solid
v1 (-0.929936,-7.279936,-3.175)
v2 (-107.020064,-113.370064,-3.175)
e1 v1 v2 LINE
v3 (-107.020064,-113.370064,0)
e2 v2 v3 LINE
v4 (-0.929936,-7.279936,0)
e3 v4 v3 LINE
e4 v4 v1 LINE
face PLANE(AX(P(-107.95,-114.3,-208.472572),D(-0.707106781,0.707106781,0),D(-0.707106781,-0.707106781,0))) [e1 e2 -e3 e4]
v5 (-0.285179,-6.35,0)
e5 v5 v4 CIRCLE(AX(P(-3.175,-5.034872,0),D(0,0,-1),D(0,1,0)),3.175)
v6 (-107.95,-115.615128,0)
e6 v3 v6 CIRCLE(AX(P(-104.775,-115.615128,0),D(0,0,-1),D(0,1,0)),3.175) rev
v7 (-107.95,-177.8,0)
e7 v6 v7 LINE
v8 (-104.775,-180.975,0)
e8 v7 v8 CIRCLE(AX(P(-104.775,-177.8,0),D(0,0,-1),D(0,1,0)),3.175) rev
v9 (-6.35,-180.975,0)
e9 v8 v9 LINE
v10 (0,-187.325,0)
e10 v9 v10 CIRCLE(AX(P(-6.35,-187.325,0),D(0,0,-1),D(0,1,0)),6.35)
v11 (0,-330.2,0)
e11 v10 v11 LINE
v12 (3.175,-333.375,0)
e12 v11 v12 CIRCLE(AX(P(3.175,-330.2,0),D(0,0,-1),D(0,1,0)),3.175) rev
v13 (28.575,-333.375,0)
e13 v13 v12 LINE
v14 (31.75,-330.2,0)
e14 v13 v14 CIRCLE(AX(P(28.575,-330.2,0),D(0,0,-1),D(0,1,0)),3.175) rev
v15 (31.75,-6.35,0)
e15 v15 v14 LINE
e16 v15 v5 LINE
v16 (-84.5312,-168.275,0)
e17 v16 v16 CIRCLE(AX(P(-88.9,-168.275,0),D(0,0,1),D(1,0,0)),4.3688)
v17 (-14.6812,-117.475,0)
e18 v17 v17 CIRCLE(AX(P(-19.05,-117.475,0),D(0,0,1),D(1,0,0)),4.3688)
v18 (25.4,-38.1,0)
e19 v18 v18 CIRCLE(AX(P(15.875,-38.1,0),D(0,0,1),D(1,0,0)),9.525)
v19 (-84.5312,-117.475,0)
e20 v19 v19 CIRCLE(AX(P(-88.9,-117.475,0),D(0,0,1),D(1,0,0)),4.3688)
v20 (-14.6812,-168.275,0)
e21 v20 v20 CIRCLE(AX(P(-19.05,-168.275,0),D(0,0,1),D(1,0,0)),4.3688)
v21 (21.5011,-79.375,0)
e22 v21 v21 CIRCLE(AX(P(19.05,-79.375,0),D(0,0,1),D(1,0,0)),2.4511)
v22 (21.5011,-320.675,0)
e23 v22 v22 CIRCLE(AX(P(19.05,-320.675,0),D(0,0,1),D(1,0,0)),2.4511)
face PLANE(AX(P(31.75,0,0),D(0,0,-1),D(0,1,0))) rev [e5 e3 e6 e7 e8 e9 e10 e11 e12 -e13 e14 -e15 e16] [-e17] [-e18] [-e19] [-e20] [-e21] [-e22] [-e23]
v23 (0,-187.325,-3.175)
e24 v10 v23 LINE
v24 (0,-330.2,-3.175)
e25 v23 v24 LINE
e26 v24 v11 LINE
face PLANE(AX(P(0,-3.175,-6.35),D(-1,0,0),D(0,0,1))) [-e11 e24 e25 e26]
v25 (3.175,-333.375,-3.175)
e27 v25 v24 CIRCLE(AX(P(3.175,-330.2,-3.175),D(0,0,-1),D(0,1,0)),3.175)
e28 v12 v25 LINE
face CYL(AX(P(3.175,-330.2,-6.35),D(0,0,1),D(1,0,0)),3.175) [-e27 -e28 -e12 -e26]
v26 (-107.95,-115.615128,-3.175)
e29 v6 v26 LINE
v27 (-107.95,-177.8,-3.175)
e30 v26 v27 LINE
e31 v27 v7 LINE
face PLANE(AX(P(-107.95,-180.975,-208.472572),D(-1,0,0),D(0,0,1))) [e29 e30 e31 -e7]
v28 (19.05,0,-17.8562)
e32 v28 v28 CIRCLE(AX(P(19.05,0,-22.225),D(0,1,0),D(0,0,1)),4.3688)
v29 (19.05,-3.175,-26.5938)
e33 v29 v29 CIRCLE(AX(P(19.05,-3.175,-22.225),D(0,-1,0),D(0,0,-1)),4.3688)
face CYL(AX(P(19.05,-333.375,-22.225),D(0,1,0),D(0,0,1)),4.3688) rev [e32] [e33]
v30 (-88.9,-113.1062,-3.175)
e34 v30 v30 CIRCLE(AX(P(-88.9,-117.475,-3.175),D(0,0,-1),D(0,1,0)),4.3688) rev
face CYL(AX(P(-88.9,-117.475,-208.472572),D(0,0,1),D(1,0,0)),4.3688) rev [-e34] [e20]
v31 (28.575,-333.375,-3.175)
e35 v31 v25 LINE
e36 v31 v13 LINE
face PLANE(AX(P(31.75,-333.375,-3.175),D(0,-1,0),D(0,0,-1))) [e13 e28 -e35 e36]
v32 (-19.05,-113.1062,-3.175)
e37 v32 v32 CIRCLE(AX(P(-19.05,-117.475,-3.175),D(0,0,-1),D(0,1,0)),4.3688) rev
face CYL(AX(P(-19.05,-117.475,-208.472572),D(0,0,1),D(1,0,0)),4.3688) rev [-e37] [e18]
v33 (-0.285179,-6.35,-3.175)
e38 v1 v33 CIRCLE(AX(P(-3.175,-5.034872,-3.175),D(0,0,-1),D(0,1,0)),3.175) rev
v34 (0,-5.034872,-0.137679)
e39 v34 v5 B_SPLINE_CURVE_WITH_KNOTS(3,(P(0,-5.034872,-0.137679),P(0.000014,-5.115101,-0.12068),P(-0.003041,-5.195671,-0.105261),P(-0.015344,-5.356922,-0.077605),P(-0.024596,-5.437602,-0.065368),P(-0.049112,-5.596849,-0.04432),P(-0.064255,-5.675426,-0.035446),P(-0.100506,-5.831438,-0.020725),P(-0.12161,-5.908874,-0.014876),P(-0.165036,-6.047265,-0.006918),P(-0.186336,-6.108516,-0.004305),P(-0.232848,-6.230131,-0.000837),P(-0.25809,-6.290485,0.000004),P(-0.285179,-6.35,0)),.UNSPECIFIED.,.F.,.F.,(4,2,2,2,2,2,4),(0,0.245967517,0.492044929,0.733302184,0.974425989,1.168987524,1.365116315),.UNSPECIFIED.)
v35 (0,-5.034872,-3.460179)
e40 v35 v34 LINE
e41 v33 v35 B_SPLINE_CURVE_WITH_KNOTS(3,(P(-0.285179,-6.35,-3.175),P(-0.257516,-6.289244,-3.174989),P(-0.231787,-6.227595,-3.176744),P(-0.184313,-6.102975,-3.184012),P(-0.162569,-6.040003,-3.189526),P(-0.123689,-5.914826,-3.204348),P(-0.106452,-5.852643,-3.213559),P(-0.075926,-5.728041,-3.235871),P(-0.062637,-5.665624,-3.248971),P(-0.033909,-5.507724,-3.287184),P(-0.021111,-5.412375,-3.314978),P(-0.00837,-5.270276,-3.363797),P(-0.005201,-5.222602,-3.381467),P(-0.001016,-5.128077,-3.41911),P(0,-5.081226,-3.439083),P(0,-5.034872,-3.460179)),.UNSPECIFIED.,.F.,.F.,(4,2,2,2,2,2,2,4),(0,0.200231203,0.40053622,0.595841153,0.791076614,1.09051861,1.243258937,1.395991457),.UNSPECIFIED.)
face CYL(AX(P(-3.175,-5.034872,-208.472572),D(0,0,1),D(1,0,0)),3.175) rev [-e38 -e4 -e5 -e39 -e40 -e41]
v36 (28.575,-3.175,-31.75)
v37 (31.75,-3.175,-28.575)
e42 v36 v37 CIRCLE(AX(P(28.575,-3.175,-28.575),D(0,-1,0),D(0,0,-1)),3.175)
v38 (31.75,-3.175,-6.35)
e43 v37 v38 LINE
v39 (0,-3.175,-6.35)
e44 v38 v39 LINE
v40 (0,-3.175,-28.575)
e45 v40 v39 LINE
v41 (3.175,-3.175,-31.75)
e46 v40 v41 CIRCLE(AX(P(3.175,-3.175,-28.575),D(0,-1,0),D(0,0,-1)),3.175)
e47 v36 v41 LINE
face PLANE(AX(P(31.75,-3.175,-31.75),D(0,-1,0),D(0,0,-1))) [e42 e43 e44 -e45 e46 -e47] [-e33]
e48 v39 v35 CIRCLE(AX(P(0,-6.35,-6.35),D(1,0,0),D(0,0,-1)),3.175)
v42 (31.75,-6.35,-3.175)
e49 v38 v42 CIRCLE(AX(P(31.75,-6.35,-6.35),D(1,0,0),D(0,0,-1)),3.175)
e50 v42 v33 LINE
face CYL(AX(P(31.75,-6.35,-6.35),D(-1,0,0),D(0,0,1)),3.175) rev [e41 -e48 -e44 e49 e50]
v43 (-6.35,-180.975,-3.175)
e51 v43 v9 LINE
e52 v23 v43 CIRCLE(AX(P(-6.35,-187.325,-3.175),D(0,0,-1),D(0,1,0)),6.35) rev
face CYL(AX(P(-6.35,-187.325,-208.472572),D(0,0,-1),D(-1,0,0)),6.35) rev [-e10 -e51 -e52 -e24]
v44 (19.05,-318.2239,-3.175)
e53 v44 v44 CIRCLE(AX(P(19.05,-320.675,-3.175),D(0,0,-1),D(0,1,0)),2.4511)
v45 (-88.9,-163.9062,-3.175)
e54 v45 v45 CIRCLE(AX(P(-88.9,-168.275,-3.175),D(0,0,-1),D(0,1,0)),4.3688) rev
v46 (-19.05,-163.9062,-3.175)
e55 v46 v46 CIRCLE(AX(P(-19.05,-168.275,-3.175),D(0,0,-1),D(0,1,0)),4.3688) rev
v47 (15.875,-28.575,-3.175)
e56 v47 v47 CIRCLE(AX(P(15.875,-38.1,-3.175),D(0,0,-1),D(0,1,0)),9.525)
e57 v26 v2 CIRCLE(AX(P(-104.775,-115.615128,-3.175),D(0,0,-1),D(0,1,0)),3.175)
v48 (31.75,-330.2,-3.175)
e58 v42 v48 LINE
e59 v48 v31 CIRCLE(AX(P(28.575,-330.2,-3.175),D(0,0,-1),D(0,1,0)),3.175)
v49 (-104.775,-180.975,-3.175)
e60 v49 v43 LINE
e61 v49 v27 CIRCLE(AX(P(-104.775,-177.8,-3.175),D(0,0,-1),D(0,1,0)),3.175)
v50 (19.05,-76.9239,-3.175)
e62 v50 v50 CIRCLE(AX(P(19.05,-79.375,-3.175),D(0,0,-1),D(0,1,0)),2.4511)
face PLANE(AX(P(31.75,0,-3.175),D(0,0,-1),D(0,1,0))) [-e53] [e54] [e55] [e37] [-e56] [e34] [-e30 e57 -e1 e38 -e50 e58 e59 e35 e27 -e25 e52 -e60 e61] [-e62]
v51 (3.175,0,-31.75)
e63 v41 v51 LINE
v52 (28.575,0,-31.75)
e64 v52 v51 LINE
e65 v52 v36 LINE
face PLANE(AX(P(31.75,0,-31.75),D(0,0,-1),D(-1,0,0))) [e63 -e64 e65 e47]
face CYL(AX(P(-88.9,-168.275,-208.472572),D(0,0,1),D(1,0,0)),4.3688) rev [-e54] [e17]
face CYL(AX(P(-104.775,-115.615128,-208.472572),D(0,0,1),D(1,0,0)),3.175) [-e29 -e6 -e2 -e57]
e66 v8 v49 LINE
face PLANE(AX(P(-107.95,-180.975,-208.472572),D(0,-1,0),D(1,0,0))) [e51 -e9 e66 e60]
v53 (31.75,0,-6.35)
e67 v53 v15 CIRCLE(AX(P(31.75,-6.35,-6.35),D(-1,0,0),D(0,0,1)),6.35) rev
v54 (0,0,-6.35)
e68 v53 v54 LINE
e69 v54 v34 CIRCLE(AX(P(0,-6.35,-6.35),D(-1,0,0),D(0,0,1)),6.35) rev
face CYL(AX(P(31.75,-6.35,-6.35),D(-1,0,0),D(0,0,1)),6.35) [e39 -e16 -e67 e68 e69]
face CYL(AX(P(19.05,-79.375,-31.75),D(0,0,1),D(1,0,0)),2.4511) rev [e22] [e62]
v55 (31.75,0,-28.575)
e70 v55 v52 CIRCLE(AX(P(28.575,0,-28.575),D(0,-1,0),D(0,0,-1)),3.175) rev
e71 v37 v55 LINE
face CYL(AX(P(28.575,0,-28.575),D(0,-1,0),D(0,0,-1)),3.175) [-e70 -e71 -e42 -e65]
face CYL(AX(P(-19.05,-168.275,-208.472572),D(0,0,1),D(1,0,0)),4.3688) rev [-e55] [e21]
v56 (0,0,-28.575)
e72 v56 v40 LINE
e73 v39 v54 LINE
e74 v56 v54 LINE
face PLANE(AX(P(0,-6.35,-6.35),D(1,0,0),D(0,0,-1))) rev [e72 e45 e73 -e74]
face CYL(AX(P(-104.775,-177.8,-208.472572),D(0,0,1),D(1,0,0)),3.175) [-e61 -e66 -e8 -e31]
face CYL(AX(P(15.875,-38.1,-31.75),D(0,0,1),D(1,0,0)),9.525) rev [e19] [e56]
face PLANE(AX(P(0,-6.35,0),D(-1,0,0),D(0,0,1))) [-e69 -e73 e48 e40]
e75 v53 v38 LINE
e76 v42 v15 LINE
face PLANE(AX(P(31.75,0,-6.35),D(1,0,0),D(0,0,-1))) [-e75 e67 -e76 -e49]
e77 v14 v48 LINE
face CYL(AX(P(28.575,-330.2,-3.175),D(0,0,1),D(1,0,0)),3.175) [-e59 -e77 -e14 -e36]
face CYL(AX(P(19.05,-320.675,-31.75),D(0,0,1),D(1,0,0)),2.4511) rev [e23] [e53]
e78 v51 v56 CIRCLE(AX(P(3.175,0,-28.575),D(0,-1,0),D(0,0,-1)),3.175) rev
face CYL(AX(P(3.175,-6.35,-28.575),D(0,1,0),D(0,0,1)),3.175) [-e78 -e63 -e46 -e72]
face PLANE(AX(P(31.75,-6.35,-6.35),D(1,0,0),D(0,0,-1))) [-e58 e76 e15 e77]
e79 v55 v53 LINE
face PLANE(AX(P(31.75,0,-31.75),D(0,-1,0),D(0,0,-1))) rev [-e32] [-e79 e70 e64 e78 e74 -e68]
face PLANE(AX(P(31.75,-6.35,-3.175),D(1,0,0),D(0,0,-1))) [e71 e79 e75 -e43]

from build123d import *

# Parameters (mm, degrees)
BASE_FLANGE1_DEPTH  = 31.75
SKETCH6_R           = 4.3688
CUT_EXTRUDE1_DEPTH  = 337.385219094
SKETCH7_R           = 2.4511
SKETCH7_R_2         = 9.525
CUT_EXTRUDE2_DEPTH  = 337.385219094
SKETCH8_R           = 4.3688
BOSS_EXTRUDE1_DEPTH = 3.175
FILLET1_R           = 6.35
FILLET2_R           = 3.175


# Sheet-metal steps are written as plain solids
with BuildPart() as part:
    # Sketch1 → Base-Flange1 (new body)
    with BuildSketch(Plane(origin=(0, 0, 0), x_dir=(0, 0, -1), z_dir=(1, 0, 0))):
        with BuildLine():
            Line((31.75, 0), (6.35, 0))
            ThreePointArc((6.35, 0), (1.859871939, -1.859871939), (0, -6.35))
            Line((0, -6.35), (0, -333.375))
            Line((0, -333.375), (3.175, -333.375))
            Line((3.175, -333.375), (3.175, -6.35))
            ThreePointArc((3.175, -6.35), (4.10493597, -4.10493597), (6.35, -3.175))
            Line((6.35, -3.175), (31.75, -3.175))
            Line((31.75, -3.175), (31.75, 0))
        make_face()
    extrude(amount=BASE_FLANGE1_DEPTH)

    # Sketch6 → Cut-Extrude1 (cut, through all)
    with BuildSketch(Plane(origin=(0, 0, 0), x_dir=(1, 0, 0), z_dir=(0, 1, 0))):
        with Locations(Location((19.05, 22.225, 0), (0, 0, 270))):
            Circle(SKETCH6_R)
    extrude(amount=-CUT_EXTRUDE1_DEPTH, mode=Mode.SUBTRACT)

    # Sketch7 → Cut-Extrude2 (cut, through all)
    with BuildSketch(Plane.XY):
        with Locations((19.05, -79.375)):
            Circle(SKETCH7_R)
        with Locations((19.05, -320.675)):
            Circle(SKETCH7_R)
        with Locations((15.875, -38.1)):
            Circle(SKETCH7_R_2)
    extrude(amount=-CUT_EXTRUDE2_DEPTH, mode=Mode.SUBTRACT)

    # Sketch8 → Boss-Extrude1 (add)
    with BuildSketch(Plane.XY):
        Polygon((-107.95, -180.975), (-107.95, -114.3), (0, -6.35), (0, -180.975), align=None)
        with Locations((-88.9, -117.475)):
            Circle(SKETCH8_R, mode=Mode.SUBTRACT)
        with Locations((-19.05, -117.475)):
            Circle(SKETCH8_R, mode=Mode.SUBTRACT)
        with Locations((-88.9, -168.275)):
            Circle(SKETCH8_R, mode=Mode.SUBTRACT)
        with Locations((-19.05, -168.275)):
            Circle(SKETCH8_R, mode=Mode.SUBTRACT)
    extrude(amount=-BOSS_EXTRUDE1_DEPTH)

    # Fillet1
    fillet1_edges = [part.edges().sort_by_distance(p)[0] for p in [
        (0, -180.975, -1.5875),
    ]]
    fillet(fillet1_edges, radius=FILLET1_R)

    # Fillet2
    fillet2_edges = [part.edges().sort_by_distance(p)[0] for p in [
        (0, -6.35, -1.5875),
        (31.75, -1.5875, -31.75),
        (-107.95, -180.975, -1.5875),
        (-107.95, -114.3, -1.5875),
        (0, -1.5875, -31.75),
        (31.75, -333.375, -1.5875),
        (0, -333.375, -1.5875),
    ]]
    fillet(fillet2_edges, radius=FILLET2_R)


solid = part.part
